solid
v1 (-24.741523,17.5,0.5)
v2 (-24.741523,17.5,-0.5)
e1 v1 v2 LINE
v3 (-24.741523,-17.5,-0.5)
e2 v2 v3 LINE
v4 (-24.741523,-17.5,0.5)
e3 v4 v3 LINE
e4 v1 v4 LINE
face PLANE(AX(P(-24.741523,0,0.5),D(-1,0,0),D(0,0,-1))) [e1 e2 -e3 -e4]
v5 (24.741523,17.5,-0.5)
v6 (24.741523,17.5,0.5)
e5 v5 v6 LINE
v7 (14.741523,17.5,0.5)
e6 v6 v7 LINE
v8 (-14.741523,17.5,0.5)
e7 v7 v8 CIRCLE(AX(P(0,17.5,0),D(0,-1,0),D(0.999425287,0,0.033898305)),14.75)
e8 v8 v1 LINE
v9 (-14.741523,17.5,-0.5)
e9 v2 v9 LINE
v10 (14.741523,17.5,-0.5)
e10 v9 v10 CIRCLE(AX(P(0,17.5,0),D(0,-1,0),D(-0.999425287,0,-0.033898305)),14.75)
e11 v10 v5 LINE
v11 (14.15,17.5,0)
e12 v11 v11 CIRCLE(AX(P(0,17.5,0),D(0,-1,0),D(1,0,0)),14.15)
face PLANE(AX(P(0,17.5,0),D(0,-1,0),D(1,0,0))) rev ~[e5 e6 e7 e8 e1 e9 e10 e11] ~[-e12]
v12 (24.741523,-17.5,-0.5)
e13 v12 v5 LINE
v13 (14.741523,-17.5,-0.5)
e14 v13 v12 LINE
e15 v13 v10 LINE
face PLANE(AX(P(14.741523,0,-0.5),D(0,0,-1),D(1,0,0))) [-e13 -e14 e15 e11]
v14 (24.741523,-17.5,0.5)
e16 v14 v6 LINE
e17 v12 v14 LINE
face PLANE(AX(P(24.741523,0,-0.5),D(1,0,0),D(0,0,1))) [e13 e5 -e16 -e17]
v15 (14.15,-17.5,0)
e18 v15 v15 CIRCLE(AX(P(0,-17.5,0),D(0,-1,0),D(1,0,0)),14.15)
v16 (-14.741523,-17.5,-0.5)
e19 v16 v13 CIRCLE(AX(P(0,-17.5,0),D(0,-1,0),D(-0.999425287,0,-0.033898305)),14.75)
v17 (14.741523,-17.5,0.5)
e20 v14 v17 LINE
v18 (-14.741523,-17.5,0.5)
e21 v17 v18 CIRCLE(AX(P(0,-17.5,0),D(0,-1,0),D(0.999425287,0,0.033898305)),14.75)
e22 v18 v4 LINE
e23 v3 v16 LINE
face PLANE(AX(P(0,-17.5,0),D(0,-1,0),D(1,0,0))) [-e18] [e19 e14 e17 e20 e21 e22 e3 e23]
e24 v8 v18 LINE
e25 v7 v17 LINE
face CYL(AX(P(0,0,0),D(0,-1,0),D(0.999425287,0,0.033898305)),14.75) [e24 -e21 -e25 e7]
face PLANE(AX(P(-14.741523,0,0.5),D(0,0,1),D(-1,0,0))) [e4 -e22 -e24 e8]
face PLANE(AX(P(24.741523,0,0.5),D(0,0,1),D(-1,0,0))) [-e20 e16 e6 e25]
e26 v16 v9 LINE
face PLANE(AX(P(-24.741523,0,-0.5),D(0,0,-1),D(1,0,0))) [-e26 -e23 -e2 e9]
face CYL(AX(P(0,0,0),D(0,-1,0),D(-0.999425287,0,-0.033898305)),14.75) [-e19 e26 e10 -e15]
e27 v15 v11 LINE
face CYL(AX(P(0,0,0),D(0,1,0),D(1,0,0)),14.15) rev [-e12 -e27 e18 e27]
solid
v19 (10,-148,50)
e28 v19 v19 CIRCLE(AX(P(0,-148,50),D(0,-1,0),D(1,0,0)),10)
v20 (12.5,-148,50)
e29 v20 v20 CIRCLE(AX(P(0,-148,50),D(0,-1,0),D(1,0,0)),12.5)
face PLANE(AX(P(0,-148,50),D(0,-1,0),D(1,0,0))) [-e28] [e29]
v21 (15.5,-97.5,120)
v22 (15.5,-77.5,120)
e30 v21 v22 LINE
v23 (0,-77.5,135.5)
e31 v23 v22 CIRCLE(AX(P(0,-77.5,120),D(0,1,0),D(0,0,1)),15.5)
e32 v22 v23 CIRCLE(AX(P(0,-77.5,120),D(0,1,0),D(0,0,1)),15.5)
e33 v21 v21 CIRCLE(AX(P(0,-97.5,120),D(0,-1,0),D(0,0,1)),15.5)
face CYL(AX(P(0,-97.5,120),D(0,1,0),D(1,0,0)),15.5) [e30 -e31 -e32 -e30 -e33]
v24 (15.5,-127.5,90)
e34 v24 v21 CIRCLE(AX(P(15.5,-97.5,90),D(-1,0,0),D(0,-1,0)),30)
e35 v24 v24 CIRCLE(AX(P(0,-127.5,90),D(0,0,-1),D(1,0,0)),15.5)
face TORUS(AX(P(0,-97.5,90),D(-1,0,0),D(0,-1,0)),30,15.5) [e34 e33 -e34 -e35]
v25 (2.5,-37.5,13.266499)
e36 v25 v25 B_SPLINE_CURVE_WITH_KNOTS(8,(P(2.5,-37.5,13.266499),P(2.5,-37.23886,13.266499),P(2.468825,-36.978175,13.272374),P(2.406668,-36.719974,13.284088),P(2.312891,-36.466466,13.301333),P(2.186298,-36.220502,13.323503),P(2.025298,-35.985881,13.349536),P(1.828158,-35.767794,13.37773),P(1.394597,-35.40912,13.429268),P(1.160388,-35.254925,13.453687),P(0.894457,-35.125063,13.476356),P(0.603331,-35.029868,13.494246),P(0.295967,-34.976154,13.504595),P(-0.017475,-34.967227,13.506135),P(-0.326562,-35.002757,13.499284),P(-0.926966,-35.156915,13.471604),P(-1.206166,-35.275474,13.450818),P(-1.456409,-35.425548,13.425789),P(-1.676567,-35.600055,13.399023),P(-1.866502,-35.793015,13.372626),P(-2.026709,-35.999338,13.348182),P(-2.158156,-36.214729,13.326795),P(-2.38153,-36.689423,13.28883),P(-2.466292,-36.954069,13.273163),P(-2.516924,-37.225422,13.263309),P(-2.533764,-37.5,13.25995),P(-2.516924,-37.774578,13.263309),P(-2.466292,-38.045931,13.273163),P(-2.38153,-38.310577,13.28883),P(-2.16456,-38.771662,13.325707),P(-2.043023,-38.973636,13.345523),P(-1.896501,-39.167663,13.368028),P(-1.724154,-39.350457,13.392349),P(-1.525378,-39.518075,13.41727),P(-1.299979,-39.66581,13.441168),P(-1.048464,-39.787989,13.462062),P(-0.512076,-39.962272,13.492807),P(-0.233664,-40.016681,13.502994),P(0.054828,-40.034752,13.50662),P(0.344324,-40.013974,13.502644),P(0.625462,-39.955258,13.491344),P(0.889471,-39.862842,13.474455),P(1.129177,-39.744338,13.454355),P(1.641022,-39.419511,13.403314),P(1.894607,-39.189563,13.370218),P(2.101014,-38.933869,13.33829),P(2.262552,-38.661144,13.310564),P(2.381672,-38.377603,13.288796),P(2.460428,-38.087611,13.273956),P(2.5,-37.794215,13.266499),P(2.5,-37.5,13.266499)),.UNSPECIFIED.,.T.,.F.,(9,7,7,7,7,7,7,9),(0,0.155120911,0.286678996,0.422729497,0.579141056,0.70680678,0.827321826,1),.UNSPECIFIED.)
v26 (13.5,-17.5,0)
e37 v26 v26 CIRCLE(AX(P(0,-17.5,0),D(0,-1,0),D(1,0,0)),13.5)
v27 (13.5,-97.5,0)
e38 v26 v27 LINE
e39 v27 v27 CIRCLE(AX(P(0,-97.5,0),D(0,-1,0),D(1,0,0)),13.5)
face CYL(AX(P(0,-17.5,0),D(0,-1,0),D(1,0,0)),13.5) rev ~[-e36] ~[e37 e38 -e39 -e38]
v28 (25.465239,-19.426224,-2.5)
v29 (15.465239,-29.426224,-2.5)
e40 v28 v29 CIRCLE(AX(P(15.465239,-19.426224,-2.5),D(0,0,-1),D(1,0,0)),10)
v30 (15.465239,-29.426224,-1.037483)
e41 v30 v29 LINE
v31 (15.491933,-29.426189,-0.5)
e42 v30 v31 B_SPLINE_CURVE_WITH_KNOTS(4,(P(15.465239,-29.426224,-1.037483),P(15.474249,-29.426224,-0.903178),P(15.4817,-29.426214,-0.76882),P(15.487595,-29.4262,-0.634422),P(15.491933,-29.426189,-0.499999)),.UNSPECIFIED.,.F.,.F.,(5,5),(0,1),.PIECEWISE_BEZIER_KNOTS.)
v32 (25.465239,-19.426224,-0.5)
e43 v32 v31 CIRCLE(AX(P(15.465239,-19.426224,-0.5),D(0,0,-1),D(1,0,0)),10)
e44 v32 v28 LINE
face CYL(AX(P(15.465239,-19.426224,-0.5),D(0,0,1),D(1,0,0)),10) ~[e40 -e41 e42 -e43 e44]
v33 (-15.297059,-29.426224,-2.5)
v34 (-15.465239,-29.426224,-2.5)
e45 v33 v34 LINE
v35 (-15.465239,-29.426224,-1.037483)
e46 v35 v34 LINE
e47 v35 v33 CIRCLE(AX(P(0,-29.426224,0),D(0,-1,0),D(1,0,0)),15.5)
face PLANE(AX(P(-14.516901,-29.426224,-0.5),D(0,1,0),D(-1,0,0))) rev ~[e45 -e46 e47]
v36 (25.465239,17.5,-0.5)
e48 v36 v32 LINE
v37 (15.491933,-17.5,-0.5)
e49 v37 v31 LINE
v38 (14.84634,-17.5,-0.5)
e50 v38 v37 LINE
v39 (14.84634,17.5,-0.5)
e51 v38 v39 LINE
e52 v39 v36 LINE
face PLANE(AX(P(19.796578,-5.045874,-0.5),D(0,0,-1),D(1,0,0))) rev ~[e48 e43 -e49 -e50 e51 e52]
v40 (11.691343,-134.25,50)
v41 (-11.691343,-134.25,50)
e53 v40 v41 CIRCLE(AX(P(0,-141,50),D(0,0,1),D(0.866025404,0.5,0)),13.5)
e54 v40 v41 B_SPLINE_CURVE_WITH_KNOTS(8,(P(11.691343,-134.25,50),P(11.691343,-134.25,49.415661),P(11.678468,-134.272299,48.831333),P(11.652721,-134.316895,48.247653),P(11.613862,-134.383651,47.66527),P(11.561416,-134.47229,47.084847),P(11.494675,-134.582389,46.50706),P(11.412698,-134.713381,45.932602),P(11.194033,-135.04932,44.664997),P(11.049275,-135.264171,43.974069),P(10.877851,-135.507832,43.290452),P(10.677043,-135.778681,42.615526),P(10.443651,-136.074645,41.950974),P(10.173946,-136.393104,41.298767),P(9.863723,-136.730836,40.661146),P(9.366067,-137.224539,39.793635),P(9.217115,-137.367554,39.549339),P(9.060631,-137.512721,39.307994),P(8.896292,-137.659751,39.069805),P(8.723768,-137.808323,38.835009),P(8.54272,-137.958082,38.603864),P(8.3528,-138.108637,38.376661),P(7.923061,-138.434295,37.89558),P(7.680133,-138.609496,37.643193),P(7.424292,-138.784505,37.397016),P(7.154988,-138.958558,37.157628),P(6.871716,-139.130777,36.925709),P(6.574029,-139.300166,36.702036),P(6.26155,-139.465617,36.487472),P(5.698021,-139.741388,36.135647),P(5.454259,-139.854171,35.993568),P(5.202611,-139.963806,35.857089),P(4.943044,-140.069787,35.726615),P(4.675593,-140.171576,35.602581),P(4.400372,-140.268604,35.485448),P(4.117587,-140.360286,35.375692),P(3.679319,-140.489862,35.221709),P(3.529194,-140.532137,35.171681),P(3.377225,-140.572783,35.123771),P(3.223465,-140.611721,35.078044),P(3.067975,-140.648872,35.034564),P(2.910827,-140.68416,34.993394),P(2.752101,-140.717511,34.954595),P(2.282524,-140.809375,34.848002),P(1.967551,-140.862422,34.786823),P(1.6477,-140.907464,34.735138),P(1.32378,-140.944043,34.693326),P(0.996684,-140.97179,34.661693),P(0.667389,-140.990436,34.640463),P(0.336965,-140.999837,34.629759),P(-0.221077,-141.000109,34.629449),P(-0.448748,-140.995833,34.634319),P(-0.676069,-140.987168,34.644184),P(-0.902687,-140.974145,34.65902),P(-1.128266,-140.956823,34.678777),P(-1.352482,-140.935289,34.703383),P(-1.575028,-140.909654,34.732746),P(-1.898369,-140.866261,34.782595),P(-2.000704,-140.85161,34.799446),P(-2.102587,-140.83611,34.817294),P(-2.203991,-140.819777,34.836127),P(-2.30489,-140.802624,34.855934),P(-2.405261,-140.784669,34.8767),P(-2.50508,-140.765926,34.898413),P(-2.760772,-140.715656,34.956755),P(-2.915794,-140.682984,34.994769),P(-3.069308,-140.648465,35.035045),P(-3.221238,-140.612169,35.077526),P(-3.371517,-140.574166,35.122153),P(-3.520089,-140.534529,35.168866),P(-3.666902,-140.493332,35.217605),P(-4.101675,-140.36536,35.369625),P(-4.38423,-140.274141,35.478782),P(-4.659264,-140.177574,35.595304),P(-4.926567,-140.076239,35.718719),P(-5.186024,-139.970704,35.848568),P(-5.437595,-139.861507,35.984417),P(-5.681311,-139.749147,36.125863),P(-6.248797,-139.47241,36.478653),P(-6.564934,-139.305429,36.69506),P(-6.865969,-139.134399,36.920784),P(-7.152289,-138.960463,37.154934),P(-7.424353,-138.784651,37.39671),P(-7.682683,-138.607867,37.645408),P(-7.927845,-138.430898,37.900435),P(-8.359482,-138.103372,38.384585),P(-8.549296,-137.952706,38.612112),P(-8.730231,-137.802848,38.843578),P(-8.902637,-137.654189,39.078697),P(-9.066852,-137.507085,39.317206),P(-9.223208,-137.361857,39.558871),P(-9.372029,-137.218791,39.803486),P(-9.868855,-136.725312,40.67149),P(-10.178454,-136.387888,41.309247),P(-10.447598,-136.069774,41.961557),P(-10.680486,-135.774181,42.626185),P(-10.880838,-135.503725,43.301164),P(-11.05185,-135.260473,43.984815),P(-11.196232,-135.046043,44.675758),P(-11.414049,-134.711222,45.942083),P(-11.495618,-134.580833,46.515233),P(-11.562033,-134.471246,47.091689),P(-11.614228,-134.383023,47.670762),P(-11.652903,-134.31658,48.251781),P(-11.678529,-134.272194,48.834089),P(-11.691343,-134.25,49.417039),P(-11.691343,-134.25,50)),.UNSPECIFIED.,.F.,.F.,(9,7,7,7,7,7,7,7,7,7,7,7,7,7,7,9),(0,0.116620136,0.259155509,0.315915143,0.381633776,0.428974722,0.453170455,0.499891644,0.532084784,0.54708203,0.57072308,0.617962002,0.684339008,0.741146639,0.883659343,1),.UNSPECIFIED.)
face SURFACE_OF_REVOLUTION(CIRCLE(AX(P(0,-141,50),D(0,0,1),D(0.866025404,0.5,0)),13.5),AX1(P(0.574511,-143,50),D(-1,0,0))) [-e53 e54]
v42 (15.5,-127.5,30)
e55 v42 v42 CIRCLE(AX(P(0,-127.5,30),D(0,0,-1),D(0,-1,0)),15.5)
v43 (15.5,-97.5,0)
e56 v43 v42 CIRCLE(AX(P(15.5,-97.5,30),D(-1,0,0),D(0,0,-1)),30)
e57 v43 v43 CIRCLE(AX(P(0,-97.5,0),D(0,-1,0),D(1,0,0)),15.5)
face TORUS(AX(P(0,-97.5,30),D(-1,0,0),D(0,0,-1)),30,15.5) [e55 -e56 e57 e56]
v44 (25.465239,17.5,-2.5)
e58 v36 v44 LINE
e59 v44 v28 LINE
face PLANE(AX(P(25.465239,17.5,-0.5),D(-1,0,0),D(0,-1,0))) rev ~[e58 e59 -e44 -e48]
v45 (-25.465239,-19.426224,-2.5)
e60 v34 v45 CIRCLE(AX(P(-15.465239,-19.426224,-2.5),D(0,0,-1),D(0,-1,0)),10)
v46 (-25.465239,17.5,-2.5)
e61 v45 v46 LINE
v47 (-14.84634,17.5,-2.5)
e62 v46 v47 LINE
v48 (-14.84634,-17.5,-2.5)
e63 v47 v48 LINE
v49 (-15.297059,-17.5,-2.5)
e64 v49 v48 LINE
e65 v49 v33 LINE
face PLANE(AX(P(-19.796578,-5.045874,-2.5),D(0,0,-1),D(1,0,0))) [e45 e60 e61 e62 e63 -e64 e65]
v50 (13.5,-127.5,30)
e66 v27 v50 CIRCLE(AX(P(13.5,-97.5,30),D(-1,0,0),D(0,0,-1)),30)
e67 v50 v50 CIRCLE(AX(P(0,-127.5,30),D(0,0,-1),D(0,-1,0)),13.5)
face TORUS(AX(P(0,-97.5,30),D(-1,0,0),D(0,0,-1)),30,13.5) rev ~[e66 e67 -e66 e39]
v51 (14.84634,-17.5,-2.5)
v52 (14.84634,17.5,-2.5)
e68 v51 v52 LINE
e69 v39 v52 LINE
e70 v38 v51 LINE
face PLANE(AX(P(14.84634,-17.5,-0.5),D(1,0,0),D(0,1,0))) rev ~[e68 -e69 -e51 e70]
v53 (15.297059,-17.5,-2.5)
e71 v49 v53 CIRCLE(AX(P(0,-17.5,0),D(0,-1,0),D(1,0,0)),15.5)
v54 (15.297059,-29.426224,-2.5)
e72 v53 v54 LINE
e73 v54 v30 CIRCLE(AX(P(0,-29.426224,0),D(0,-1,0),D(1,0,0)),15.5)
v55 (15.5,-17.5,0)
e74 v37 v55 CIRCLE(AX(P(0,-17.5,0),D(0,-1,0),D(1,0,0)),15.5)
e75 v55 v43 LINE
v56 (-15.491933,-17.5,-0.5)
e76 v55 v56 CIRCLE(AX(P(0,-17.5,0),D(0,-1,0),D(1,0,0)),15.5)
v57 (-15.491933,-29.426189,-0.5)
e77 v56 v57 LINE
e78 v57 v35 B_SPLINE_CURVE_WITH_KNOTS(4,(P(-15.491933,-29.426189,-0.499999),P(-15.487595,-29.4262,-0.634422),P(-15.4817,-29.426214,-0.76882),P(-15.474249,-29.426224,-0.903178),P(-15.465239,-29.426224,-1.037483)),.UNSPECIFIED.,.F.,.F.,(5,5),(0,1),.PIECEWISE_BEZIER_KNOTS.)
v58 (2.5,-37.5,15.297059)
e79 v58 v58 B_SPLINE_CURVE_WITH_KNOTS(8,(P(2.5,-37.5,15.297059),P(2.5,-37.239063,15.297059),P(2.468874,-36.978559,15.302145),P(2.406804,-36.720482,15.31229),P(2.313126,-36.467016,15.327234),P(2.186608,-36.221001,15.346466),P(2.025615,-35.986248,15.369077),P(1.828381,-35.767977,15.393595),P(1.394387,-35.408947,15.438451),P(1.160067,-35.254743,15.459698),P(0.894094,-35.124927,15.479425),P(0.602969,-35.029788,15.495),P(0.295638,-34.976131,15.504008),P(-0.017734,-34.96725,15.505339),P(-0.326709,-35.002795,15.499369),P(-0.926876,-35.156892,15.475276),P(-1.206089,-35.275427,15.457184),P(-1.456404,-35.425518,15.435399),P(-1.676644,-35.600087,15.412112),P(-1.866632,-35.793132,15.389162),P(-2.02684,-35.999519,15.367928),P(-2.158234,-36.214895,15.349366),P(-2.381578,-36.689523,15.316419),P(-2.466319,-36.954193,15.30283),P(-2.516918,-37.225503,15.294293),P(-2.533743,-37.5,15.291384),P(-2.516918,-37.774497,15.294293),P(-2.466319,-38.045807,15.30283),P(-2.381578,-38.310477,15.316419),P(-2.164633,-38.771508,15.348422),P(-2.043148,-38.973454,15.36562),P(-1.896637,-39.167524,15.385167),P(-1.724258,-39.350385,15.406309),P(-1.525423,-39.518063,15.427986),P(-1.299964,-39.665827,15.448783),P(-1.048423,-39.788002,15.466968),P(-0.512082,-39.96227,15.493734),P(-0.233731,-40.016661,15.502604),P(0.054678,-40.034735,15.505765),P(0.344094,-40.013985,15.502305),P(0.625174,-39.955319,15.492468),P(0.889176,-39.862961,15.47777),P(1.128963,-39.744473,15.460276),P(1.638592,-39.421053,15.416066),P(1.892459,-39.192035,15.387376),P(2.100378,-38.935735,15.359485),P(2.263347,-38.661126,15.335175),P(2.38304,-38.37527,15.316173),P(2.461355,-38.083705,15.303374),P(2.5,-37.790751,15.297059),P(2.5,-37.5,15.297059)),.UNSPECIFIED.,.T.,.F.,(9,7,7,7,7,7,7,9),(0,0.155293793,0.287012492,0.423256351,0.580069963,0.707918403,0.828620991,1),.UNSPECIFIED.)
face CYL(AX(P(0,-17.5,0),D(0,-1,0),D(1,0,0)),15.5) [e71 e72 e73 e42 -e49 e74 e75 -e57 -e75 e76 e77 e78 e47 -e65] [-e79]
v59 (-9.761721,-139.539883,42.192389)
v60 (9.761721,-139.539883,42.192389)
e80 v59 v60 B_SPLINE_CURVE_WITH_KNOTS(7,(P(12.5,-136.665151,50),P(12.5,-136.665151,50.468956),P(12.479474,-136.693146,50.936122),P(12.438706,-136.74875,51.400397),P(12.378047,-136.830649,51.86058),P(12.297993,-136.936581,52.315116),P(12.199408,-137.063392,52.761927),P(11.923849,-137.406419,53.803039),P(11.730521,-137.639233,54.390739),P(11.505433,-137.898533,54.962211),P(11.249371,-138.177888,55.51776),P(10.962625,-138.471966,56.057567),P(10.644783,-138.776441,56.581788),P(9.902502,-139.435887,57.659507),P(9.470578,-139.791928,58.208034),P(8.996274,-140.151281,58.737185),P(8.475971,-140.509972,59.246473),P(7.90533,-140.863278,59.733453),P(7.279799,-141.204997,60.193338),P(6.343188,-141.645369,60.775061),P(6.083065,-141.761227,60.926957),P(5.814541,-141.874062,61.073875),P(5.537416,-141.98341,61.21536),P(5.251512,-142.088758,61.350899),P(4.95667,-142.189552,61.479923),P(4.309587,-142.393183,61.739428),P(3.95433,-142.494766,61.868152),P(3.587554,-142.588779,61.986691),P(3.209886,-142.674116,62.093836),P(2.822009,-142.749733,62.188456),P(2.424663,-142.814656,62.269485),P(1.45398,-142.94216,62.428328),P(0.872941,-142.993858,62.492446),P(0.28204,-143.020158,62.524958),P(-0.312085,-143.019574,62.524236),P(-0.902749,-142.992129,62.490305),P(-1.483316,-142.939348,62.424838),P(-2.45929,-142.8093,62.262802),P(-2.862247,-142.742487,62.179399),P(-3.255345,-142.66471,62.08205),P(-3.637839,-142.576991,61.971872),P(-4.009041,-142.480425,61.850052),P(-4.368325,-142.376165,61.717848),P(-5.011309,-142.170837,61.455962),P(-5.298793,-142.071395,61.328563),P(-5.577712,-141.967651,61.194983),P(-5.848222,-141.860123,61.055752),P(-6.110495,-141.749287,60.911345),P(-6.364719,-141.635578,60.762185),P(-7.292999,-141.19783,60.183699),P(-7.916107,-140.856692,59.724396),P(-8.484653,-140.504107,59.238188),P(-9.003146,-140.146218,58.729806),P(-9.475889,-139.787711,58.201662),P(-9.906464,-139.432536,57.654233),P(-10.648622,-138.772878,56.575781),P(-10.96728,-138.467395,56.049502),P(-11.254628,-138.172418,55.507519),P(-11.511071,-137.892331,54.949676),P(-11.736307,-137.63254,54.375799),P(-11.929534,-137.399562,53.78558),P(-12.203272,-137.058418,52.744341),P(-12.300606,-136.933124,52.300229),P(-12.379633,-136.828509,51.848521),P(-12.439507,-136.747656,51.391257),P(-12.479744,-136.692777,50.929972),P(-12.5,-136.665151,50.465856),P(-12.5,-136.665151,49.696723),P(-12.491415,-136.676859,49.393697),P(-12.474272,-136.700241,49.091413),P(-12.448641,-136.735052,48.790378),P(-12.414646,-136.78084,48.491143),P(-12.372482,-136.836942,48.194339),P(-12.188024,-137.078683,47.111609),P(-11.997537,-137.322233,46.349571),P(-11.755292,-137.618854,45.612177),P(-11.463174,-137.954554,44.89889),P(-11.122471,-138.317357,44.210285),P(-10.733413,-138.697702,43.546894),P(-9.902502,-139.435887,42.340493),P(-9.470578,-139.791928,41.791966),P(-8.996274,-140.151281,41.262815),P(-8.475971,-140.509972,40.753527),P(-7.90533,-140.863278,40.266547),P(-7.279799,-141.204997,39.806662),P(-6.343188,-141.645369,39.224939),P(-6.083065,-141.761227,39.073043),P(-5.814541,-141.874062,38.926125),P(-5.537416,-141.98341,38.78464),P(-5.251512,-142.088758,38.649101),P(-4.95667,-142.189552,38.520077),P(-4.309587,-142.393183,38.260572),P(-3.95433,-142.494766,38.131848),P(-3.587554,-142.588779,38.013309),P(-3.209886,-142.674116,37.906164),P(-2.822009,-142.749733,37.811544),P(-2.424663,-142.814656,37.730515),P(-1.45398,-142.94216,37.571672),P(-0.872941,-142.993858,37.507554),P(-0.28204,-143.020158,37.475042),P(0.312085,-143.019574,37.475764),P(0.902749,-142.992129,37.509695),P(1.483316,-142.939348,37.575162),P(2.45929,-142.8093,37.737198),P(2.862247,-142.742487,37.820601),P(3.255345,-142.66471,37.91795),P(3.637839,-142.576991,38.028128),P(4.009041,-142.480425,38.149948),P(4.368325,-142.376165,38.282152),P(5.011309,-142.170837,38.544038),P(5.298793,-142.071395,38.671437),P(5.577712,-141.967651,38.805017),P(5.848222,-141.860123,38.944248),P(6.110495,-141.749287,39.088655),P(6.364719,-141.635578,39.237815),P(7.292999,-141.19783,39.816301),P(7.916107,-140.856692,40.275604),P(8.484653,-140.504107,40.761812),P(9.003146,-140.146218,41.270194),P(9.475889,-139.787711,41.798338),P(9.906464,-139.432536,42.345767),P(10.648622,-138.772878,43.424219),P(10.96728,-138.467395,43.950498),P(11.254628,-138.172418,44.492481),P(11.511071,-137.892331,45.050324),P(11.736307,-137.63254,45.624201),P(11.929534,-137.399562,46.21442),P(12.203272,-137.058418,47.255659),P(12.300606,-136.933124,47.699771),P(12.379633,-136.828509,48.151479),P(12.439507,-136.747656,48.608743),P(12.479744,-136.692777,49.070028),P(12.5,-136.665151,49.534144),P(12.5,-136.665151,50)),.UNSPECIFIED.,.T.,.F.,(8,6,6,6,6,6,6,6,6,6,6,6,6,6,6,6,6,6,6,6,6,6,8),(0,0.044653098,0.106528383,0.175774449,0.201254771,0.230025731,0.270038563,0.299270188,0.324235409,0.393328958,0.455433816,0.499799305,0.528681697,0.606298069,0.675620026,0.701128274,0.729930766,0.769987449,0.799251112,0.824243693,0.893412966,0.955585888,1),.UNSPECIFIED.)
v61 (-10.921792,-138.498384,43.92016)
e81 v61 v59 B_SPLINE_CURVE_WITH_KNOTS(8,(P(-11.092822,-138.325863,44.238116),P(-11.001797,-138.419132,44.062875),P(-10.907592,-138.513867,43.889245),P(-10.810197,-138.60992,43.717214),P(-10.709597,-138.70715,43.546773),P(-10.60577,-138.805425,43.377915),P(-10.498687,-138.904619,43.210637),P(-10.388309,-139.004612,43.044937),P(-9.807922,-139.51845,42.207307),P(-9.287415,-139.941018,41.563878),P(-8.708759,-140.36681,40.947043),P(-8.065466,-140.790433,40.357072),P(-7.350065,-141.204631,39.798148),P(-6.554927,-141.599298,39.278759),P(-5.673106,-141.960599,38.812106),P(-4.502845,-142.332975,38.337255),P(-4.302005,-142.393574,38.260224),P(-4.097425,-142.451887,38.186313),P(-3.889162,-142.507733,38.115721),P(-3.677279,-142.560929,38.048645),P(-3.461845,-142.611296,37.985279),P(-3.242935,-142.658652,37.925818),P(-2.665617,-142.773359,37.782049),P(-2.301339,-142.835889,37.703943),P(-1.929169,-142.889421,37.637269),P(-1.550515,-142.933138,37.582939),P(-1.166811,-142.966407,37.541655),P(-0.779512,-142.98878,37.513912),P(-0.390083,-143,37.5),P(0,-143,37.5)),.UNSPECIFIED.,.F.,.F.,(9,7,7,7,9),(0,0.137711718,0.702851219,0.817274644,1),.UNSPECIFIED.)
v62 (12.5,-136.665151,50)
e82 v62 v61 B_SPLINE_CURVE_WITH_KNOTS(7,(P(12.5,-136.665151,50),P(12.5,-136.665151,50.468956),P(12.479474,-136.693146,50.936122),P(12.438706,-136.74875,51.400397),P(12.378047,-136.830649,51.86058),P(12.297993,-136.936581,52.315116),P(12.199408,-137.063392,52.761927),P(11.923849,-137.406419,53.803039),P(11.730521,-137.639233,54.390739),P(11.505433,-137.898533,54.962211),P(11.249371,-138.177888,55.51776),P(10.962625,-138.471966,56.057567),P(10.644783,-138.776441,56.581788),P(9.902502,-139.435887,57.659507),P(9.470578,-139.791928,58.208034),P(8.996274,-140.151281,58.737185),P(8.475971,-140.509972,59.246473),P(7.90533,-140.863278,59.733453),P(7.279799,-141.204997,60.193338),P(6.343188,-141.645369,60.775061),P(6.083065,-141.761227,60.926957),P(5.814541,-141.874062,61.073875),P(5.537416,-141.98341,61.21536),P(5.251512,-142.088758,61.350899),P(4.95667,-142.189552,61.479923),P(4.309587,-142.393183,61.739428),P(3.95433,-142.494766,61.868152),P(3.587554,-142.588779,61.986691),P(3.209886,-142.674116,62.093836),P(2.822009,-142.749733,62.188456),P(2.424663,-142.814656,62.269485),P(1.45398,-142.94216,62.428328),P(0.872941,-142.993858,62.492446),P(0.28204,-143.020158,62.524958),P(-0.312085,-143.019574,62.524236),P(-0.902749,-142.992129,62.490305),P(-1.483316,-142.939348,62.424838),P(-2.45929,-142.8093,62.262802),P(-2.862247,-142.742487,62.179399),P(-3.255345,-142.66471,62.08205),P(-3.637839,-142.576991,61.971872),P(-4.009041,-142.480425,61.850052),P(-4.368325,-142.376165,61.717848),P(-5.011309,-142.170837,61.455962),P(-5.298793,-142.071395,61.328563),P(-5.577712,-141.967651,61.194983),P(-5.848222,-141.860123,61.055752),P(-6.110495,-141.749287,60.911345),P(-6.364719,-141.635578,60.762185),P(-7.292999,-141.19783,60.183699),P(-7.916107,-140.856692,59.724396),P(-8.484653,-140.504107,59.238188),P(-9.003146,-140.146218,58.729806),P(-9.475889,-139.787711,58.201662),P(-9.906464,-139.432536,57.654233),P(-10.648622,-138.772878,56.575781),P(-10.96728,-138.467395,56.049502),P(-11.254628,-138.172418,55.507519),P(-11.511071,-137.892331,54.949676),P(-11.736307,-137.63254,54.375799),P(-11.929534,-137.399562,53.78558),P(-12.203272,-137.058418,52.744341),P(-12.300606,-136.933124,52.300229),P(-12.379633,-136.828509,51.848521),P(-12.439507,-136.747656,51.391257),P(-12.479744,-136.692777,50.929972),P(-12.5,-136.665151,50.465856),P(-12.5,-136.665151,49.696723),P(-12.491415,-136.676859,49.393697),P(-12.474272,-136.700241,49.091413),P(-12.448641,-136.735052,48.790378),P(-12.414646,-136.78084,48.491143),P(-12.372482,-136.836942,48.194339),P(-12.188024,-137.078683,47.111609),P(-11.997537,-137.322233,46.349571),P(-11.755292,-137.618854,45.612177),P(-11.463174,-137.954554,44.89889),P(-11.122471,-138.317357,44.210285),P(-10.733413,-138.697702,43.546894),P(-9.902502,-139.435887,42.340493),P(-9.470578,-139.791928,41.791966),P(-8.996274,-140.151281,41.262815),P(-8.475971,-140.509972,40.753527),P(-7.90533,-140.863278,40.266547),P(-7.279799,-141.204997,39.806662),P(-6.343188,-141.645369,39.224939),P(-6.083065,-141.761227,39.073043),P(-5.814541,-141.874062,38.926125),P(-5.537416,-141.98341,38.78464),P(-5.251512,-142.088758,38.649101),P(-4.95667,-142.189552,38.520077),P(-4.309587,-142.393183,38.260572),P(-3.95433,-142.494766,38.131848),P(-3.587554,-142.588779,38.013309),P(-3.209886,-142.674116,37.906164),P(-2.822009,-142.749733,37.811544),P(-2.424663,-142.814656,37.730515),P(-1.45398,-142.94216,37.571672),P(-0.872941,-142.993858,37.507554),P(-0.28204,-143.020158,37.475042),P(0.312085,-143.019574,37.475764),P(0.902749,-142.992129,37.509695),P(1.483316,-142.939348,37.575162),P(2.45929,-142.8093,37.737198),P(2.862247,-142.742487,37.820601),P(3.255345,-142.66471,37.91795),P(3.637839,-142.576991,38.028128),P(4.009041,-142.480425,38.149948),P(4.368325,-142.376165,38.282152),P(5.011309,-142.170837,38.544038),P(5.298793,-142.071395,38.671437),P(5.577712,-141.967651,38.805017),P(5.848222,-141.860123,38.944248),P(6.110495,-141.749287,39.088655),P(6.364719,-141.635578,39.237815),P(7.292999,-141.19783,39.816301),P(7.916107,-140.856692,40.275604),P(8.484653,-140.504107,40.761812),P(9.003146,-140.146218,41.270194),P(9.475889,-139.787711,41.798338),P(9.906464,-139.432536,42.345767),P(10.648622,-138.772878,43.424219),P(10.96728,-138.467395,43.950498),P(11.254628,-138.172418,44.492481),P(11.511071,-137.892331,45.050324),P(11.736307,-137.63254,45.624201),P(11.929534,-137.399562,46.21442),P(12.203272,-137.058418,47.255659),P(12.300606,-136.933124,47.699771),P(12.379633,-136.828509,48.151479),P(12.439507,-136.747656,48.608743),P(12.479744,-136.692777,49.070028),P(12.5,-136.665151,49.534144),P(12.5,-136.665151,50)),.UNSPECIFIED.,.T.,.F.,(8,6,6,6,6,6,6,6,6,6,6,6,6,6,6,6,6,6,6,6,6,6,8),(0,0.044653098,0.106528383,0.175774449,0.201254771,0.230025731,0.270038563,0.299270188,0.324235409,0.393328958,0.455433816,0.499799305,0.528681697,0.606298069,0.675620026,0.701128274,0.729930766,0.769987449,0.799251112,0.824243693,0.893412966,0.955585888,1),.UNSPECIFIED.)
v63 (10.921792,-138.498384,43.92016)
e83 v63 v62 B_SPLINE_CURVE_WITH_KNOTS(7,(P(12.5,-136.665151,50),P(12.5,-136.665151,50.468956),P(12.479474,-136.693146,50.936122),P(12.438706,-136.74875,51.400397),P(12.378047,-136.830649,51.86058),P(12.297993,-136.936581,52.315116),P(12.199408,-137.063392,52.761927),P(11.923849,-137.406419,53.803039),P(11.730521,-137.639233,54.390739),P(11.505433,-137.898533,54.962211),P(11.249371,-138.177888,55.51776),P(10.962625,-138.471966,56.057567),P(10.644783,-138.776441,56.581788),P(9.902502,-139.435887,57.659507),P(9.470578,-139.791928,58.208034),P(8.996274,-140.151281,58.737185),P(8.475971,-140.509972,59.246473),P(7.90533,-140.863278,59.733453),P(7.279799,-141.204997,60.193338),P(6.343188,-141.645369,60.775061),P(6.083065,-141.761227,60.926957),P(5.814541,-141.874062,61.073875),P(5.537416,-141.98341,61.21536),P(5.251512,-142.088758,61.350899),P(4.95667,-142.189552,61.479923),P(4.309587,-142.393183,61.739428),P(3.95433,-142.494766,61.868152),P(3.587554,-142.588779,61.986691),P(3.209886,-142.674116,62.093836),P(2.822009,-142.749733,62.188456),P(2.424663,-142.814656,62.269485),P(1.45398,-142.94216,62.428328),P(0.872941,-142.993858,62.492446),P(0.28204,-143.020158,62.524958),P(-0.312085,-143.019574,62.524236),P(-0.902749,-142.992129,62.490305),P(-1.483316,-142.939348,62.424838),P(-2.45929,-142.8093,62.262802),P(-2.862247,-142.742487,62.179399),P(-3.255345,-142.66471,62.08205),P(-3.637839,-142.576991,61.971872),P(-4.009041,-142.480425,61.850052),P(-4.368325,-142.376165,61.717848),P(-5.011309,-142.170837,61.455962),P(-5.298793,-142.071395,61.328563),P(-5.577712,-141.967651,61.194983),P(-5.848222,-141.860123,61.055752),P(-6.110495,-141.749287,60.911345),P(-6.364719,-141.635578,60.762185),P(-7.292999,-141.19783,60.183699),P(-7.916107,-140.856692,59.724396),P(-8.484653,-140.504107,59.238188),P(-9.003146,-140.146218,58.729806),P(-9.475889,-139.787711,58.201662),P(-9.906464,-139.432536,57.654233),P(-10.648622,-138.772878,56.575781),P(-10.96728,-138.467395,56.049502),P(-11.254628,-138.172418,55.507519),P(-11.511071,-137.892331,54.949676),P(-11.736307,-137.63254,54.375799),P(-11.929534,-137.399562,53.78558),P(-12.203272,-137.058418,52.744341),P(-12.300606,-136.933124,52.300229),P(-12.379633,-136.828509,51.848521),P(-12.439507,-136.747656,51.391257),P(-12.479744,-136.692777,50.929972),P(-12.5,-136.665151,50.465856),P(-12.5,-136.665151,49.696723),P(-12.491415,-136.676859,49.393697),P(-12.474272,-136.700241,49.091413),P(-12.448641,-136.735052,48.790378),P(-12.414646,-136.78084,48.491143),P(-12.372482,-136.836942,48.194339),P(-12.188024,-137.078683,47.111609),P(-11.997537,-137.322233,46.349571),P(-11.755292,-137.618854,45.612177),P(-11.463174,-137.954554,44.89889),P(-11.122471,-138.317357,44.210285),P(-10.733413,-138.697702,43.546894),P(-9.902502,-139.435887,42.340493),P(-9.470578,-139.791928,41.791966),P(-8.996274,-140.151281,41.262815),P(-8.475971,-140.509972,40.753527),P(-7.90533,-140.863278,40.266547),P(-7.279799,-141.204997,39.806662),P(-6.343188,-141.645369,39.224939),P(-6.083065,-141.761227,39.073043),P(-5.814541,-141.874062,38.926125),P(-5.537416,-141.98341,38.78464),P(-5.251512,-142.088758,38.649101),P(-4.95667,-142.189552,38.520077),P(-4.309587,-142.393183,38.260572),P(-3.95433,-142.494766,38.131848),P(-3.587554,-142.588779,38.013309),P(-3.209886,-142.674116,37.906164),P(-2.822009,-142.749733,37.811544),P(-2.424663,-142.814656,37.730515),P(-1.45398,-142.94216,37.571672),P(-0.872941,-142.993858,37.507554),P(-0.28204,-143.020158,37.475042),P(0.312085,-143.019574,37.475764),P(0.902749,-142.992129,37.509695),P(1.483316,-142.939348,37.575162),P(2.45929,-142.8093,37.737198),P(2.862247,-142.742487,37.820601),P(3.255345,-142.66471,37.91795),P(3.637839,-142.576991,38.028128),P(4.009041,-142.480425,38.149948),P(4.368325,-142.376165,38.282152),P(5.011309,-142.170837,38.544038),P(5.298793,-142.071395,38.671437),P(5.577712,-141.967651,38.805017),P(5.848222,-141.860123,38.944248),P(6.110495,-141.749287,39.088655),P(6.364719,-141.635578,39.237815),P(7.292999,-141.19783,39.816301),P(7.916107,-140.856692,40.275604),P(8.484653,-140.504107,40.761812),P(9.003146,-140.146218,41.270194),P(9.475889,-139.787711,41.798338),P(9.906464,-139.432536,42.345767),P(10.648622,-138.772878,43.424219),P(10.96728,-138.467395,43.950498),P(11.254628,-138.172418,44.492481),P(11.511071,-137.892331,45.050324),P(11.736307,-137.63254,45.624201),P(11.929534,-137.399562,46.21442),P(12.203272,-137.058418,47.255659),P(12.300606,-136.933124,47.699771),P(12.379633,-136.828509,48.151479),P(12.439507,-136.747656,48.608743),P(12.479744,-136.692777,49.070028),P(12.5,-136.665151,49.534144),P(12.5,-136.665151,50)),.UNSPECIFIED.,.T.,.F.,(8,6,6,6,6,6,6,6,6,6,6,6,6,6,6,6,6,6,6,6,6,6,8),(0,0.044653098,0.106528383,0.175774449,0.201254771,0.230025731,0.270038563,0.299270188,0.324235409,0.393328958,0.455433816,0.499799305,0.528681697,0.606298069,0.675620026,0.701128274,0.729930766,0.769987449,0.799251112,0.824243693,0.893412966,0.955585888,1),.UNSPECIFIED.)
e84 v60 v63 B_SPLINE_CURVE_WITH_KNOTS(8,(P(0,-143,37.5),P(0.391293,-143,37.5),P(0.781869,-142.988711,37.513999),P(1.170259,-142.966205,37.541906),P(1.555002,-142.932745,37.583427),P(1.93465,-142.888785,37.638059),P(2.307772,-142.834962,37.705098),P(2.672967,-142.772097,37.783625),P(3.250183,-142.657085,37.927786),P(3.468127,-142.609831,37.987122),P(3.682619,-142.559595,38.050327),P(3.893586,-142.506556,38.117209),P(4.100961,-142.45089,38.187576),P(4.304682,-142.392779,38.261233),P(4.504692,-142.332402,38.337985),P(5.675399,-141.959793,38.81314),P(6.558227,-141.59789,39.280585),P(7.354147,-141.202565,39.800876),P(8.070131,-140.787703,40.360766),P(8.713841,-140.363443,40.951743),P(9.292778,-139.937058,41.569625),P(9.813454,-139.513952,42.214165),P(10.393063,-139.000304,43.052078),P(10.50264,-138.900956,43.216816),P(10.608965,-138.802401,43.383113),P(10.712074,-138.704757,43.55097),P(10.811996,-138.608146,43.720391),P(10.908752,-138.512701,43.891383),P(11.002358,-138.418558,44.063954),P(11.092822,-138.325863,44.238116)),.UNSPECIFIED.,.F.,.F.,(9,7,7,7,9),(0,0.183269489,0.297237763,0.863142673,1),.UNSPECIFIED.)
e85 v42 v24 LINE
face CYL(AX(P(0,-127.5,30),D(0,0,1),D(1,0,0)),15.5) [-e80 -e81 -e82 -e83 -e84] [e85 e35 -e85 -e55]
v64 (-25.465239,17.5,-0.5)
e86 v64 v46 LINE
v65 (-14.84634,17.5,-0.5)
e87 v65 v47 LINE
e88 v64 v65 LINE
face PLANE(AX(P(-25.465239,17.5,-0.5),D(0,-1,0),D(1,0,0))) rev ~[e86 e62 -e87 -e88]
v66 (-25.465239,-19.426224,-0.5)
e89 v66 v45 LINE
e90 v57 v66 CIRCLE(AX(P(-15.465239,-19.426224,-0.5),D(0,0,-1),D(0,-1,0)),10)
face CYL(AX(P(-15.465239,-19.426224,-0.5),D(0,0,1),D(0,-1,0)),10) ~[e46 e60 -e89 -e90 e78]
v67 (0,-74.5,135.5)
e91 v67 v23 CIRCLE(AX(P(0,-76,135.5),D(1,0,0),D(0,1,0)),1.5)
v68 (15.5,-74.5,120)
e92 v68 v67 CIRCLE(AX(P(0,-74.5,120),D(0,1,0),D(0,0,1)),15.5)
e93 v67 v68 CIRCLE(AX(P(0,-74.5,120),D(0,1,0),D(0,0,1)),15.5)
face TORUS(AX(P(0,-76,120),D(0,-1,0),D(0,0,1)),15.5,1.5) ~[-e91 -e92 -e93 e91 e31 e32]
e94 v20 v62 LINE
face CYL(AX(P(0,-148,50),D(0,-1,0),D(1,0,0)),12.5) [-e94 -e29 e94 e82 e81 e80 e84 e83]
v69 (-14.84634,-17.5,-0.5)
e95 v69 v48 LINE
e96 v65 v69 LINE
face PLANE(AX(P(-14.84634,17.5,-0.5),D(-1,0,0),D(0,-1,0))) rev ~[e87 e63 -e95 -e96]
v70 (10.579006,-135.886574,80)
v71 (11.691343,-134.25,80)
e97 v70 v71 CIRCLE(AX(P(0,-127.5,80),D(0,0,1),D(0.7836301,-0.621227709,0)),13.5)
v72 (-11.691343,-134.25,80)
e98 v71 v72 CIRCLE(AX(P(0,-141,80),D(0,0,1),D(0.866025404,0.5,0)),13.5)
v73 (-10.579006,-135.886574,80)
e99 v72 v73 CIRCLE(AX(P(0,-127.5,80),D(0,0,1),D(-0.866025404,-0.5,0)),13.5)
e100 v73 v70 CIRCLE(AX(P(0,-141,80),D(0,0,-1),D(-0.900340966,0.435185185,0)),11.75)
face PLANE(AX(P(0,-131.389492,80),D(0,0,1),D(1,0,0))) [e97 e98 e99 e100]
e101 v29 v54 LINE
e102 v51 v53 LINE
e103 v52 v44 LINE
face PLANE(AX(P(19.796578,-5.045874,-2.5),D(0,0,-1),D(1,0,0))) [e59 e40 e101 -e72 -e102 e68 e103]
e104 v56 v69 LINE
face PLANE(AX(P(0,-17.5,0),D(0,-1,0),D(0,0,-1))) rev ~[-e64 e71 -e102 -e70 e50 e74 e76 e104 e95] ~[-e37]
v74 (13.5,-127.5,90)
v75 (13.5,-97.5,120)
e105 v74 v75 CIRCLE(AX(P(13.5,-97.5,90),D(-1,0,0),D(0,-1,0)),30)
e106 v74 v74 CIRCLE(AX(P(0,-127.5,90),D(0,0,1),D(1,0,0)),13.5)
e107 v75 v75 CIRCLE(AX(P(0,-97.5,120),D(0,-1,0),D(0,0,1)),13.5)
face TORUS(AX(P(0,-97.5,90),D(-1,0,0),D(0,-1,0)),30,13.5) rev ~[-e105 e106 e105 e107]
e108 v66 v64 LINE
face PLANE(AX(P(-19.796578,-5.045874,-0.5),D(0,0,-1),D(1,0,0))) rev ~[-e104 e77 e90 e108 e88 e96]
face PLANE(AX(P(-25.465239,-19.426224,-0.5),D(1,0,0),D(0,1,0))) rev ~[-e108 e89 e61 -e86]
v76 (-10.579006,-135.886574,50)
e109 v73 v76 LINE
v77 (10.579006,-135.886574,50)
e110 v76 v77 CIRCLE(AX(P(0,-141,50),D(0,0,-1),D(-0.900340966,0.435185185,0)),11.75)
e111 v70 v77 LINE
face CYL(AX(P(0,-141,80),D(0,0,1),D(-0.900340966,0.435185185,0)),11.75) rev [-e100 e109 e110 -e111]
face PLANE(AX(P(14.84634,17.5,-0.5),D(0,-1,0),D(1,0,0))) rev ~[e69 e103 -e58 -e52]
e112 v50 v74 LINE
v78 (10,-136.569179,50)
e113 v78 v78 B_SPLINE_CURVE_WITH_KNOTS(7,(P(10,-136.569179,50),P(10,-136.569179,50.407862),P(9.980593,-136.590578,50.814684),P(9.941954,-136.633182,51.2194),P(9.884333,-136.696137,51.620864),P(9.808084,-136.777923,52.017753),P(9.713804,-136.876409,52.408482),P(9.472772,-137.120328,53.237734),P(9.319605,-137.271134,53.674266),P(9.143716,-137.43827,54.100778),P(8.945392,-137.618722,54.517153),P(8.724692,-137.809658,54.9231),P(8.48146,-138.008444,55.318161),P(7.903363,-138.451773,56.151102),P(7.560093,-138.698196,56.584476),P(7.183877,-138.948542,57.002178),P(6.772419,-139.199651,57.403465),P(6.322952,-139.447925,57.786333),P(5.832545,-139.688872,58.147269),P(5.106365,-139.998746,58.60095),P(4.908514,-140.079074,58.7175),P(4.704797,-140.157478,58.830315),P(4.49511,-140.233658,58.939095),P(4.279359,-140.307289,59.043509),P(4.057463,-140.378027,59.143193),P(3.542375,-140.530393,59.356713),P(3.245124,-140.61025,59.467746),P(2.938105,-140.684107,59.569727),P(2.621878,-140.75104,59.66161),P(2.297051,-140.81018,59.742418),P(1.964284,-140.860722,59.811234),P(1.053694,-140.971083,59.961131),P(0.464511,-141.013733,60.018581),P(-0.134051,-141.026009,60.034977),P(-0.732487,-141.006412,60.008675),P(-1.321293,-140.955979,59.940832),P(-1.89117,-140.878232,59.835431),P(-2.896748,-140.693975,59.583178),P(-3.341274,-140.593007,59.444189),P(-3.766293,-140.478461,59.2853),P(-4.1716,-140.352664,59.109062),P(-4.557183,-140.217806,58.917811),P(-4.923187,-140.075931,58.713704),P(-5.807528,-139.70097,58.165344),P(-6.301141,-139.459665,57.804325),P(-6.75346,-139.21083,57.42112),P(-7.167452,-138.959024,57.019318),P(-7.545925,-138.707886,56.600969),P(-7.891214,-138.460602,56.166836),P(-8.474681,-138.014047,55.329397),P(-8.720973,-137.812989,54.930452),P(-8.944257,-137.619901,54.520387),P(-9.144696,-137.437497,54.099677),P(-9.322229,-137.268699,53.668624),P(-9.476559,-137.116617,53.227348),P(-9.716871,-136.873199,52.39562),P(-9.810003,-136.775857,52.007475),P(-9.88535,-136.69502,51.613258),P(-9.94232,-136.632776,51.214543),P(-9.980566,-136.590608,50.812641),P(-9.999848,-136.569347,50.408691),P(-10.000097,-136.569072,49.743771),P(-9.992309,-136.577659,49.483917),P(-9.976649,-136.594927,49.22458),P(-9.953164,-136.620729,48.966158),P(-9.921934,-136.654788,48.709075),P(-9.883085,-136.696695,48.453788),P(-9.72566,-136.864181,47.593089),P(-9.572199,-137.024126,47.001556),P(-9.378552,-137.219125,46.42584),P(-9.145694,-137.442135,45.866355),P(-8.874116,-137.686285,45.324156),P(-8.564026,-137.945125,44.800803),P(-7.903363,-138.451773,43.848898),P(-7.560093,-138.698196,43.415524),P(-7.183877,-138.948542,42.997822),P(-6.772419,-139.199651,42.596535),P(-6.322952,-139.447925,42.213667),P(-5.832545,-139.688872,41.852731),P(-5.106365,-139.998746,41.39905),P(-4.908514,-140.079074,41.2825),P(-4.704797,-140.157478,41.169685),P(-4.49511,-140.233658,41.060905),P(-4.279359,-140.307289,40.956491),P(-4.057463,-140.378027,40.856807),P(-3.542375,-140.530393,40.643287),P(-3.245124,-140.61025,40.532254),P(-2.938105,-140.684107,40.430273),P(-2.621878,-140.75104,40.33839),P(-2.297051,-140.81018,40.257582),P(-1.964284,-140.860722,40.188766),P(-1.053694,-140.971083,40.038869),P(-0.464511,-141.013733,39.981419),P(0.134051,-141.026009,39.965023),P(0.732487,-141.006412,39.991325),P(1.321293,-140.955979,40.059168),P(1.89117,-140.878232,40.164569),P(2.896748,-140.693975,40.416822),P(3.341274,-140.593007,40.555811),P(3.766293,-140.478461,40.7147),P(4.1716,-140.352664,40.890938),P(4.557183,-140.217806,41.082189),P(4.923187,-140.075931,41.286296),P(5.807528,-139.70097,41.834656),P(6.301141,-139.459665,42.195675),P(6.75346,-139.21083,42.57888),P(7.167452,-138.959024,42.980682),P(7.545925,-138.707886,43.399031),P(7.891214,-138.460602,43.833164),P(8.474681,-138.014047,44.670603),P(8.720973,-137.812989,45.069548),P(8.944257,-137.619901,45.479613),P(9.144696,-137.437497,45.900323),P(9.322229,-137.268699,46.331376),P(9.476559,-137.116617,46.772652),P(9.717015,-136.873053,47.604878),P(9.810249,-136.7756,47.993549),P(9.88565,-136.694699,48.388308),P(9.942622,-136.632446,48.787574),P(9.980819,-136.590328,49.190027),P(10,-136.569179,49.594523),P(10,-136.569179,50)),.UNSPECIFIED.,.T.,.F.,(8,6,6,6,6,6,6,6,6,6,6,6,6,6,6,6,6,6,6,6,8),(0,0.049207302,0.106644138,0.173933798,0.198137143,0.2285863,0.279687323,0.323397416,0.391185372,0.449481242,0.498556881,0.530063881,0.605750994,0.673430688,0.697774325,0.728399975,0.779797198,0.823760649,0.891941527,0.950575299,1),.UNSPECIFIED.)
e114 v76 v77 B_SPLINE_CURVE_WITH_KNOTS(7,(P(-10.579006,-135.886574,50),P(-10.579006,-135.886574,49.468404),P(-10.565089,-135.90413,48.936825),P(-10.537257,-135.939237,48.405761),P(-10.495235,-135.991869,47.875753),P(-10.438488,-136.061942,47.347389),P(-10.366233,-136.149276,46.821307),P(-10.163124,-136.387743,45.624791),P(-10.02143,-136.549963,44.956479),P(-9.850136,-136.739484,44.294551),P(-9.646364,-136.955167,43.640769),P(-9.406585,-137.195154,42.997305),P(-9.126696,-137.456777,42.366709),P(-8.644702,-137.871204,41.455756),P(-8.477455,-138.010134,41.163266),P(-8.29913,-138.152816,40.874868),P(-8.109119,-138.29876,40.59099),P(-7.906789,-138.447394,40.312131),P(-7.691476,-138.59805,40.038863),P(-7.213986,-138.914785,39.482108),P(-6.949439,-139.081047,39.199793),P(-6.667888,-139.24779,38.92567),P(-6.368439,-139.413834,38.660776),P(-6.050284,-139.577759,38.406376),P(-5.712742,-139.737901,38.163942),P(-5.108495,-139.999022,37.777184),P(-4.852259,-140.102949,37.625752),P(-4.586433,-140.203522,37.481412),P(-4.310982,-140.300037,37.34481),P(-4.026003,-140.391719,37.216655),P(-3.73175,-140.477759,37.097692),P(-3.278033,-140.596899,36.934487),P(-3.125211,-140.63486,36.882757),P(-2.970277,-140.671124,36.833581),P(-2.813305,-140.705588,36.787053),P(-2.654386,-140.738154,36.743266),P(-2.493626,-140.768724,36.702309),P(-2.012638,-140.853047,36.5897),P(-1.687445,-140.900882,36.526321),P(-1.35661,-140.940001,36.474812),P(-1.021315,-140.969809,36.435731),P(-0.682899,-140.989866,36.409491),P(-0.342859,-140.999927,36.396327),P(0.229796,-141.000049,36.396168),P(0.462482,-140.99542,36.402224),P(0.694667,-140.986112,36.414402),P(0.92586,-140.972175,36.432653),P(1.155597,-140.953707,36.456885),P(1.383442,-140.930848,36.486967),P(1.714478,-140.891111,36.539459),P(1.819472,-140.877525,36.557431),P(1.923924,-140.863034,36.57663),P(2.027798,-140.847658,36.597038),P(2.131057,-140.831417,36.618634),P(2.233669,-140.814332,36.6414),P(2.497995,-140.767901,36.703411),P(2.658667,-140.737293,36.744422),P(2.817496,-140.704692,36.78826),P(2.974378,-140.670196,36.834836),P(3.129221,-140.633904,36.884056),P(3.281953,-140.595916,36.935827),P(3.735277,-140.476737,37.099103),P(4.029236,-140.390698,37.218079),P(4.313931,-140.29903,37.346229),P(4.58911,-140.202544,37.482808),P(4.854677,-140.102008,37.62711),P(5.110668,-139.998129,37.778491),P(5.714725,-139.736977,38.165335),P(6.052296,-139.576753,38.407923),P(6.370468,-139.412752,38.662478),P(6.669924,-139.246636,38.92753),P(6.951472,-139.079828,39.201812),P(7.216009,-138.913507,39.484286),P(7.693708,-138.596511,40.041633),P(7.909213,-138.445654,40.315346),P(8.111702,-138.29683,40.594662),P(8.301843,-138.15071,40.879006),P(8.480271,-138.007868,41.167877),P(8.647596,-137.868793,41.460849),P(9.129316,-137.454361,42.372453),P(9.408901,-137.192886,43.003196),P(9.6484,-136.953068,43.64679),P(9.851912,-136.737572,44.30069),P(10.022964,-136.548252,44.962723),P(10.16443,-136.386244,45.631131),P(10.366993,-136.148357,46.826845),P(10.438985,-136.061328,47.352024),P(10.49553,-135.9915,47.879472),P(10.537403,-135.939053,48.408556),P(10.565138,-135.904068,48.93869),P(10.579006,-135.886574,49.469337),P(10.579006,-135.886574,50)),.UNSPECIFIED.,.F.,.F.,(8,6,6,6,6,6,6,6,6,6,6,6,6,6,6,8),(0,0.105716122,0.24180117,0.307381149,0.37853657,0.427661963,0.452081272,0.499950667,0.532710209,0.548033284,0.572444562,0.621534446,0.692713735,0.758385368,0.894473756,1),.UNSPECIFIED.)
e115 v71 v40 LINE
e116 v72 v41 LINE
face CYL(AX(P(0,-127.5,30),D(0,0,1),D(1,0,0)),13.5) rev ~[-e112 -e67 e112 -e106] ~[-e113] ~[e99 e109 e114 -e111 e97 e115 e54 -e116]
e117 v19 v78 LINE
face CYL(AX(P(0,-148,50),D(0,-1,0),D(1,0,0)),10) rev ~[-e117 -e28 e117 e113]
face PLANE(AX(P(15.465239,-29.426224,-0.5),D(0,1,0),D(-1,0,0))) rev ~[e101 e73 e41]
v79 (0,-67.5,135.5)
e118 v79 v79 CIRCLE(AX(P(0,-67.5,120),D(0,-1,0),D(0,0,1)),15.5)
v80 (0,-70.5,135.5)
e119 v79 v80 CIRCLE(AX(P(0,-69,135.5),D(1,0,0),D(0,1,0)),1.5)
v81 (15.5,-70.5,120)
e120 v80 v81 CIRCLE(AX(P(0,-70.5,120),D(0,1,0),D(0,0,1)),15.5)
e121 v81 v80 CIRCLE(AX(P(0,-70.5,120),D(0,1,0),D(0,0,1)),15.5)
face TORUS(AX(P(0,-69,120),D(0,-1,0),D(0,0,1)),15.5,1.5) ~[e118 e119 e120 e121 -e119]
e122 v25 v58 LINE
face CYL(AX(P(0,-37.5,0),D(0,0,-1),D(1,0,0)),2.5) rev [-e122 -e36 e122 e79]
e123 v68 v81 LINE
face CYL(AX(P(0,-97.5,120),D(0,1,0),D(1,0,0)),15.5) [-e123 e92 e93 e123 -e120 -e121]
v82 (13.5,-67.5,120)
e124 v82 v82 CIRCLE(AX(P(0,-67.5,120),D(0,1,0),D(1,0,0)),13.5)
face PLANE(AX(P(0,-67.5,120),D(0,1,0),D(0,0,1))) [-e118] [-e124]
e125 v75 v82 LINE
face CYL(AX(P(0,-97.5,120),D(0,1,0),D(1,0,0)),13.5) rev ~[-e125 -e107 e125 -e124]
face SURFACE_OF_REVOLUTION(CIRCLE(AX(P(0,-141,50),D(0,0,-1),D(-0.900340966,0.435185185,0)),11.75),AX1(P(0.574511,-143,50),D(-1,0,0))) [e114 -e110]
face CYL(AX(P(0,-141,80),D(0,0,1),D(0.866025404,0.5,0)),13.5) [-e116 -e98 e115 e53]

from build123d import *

# Parameters (mm, degrees)
F0_R      = 14.15
F1_DEPTH  = 17.5
F3_R      = 15.5
F3_R_2    = 13.5
F11_R     = 2.5
F12_DEPTH = 137.0010001
F18_DEPTH = 2
F23_DEPTH = 30
F26_ANGLE = 90
F27_W     = 6.0253508091
F27_H     = 56.4770405108
F20_R     = 12.5
F30_R     = 10
F31_DEPTH = 11.4318215269


with BuildPart() as f1:
    # F0 (on Front) → F1 (new body, symmetric)
    with BuildSketch(Plane.XZ):
        with BuildLine():
            Line((24.7415229878, 0.5), (14.7415229878, 0.5))
            ThreePointArc((14.7415229878, 0.5), (0, 14.75), (-14.7415229878, 0.5))
            Line((-14.7415229878, 0.5), (-24.7415229878, 0.5))
            Line((-24.7415229878, 0.5), (-24.7415229878, -0.5))
            Line((-24.7415229878, -0.5), (-14.7415229878, -0.5))
            ThreePointArc((-14.7415229878, -0.5), (0, -14.75), (14.7415229878, -0.5))
            Line((14.7415229878, -0.5), (24.7415229878, -0.5))
            Line((24.7415229878, -0.5), (24.7415229878, 0.5))
        make_face()
        Circle(F0_R, mode=Mode.SUBTRACT)
    extrude(amount=F1_DEPTH, both=True)


with BuildPart() as f4:
    # F4: sweep along a path in F2
    with BuildLine(Plane.YZ) as f4_path:
        Line((-17.5, 0), (-97.5, 0))
        ThreePointArc((-97.5, 0), (-118.7132034356, 8.7867965644), (-127.5, 30))
        Line((-127.5, 30), (-127.5, 90))
        ThreePointArc((-127.5, 90), (-118.7132034356, 111.2132034356), (-97.5, 120))
        Line((-97.5, 120), (-67.5, 120))
    # F3 (on face) → F4 (sweep)
    with BuildSketch(Plane.XZ.offset(17.5)):
        Circle(F3_R)
        Circle(F3_R_2, mode=Mode.SUBTRACT)
    sweep(path=f4_path.line)

    # F9 (on Right) → F10 (revolve)
    with BuildSketch(Plane.YZ):
        with BuildLine():
            Line((-70.5, 135.5), (-67.5, 135.5))
            ThreePointArc((-67.5, 135.5), (-69, 137), (-70.5, 135.5))
        make_face()
        with BuildLine():
            Line((-77.5, 135.5), (-74.5, 135.5))
            ThreePointArc((-74.5, 135.5), (-76, 137), (-77.5, 135.5))
        make_face()
    revolve(axis=Axis((0, -82.5, 120), (0, 1, 0)))

    # F11 (on Top) → F12 (cut, through all)
    with BuildSketch(Plane.XY):
        with Locations((0, -37.5)):
            Circle(F11_R)
    extrude(amount=F12_DEPTH, mode=Mode.SUBTRACT)

    # F17 (on offset) → F18 (join)
    with BuildSketch(Plane(origin=(0, 0, -0.5), x_dir=(1, 0, 0), z_dir=(0, 0, -1))):
        with BuildLine():
            Line((-25.4652393452, 19.4262243624), (-25.4652393452, -17.5))
            Line((-25.4652393452, -17.5), (-14.846339575, -17.5))
            Line((-14.846339575, -17.5), (-14.846339575, 17.5))
            Line((-14.846339575, 17.5), (-14.5169012249, 17.5))
            Line((-14.5169012249, 17.5), (-14.5169012249, 29.4262243624))
            Line((-14.5169012249, 29.4262243624), (-14.846339575, 29.4262243624))
            Line((-14.846339575, 29.4262243624), (-15.4652393452, 29.4262243624))
            ThreePointArc((-15.4652393452, 29.4262243624), (-22.5363071571, 26.4972921743), (-25.4652393452, 19.4262243624))
        make_face()
        with BuildLine():
            Line((14.5169012249, 29.4262243624), (14.5169012249, 17.5))
            Line((14.5169012249, 17.5), (14.846339575, 17.5))
            Line((14.846339575, 17.5), (14.846339575, -17.5))
            Line((14.846339575, -17.5), (25.4652393452, -17.5))
            Line((25.4652393452, -17.5), (25.4652393452, 19.4262243624))
            ThreePointArc((25.4652393452, 19.4262243624), (22.5363071571, 26.4972921743), (15.4652393452, 29.4262243624))
            Line((15.4652393452, 29.4262243624), (14.846339575, 29.4262243624))
            Line((14.846339575, 29.4262243624), (14.5169012249, 29.4262243624))
        make_face()
    extrude(amount=F18_DEPTH)

    # F19 (on offset) → F23 (join, through all)
    with BuildSketch(Plane.XY.offset(80)):
        with BuildLine():
            ThreePointArc((10.5790063475, -135.8865740741), (11.165200766, -135.0886950034), (11.6913429511, -134.25))
            ThreePointArc((11.6913429511, -134.25), (0, -127.5), (-11.6913429511, -134.25))
            ThreePointArc((-11.6913429511, -134.25), (-11.165200766, -135.0886950034), (-10.5790063475, -135.8865740741))
            ThreePointArc((-10.5790063475, -135.8865740741), (0, -129.25), (10.5790063475, -135.8865740741))
        make_face()
    extrude(amount=-F23_DEPTH)

    # F25 (on plane+point) → F26 (revolve)
    with BuildSketch(Plane.XY.offset(50)):
        with BuildLine():
            ThreePointArc((10.5790063475, -135.8865740741), (11.165200766, -135.0886950034), (11.6913429511, -134.25))
            ThreePointArc((11.6913429511, -134.25), (0, -127.5), (-11.6913429511, -134.25))
            ThreePointArc((-11.6913429511, -134.25), (-11.165200766, -135.0886950034), (-10.5790063475, -135.8865740741))
            ThreePointArc((-10.5790063475, -135.8865740741), (0, -129.25), (10.5790063475, -135.8865740741))
        make_face()
    revolve(axis=Axis((0.5745105445, -143, 50), (-1, 0, 0)), revolution_arc=F26_ANGLE)

    # F27 (on Right) → F28 (revolve, cut)
    with BuildSketch(Plane.YZ):
        with Locations((-146.0126754045, 61.7614797446)):
            Rectangle(F27_W, F27_H)
    revolve(axis=Axis((0, -127.5, 60), (0, 0, 1)), mode=Mode.SUBTRACT)

    # F20 (on offset) → F29 (join, up to the next surface of F4)
    with BuildSketch(Plane.XZ.offset(148)):
        with Locations((0, 50)):
            Circle(F20_R)
    extrude(until=Until.NEXT, dir=(0, 1, 0))

    # F30 (on face) → F31 (cut, through all)
    with BuildSketch(Plane.XZ.offset(148)):
        with Locations((0, 50)):
            Circle(F30_R)
    extrude(amount=-F31_DEPTH, mode=Mode.SUBTRACT)


solid = Compound([f1.part, f4.part])
